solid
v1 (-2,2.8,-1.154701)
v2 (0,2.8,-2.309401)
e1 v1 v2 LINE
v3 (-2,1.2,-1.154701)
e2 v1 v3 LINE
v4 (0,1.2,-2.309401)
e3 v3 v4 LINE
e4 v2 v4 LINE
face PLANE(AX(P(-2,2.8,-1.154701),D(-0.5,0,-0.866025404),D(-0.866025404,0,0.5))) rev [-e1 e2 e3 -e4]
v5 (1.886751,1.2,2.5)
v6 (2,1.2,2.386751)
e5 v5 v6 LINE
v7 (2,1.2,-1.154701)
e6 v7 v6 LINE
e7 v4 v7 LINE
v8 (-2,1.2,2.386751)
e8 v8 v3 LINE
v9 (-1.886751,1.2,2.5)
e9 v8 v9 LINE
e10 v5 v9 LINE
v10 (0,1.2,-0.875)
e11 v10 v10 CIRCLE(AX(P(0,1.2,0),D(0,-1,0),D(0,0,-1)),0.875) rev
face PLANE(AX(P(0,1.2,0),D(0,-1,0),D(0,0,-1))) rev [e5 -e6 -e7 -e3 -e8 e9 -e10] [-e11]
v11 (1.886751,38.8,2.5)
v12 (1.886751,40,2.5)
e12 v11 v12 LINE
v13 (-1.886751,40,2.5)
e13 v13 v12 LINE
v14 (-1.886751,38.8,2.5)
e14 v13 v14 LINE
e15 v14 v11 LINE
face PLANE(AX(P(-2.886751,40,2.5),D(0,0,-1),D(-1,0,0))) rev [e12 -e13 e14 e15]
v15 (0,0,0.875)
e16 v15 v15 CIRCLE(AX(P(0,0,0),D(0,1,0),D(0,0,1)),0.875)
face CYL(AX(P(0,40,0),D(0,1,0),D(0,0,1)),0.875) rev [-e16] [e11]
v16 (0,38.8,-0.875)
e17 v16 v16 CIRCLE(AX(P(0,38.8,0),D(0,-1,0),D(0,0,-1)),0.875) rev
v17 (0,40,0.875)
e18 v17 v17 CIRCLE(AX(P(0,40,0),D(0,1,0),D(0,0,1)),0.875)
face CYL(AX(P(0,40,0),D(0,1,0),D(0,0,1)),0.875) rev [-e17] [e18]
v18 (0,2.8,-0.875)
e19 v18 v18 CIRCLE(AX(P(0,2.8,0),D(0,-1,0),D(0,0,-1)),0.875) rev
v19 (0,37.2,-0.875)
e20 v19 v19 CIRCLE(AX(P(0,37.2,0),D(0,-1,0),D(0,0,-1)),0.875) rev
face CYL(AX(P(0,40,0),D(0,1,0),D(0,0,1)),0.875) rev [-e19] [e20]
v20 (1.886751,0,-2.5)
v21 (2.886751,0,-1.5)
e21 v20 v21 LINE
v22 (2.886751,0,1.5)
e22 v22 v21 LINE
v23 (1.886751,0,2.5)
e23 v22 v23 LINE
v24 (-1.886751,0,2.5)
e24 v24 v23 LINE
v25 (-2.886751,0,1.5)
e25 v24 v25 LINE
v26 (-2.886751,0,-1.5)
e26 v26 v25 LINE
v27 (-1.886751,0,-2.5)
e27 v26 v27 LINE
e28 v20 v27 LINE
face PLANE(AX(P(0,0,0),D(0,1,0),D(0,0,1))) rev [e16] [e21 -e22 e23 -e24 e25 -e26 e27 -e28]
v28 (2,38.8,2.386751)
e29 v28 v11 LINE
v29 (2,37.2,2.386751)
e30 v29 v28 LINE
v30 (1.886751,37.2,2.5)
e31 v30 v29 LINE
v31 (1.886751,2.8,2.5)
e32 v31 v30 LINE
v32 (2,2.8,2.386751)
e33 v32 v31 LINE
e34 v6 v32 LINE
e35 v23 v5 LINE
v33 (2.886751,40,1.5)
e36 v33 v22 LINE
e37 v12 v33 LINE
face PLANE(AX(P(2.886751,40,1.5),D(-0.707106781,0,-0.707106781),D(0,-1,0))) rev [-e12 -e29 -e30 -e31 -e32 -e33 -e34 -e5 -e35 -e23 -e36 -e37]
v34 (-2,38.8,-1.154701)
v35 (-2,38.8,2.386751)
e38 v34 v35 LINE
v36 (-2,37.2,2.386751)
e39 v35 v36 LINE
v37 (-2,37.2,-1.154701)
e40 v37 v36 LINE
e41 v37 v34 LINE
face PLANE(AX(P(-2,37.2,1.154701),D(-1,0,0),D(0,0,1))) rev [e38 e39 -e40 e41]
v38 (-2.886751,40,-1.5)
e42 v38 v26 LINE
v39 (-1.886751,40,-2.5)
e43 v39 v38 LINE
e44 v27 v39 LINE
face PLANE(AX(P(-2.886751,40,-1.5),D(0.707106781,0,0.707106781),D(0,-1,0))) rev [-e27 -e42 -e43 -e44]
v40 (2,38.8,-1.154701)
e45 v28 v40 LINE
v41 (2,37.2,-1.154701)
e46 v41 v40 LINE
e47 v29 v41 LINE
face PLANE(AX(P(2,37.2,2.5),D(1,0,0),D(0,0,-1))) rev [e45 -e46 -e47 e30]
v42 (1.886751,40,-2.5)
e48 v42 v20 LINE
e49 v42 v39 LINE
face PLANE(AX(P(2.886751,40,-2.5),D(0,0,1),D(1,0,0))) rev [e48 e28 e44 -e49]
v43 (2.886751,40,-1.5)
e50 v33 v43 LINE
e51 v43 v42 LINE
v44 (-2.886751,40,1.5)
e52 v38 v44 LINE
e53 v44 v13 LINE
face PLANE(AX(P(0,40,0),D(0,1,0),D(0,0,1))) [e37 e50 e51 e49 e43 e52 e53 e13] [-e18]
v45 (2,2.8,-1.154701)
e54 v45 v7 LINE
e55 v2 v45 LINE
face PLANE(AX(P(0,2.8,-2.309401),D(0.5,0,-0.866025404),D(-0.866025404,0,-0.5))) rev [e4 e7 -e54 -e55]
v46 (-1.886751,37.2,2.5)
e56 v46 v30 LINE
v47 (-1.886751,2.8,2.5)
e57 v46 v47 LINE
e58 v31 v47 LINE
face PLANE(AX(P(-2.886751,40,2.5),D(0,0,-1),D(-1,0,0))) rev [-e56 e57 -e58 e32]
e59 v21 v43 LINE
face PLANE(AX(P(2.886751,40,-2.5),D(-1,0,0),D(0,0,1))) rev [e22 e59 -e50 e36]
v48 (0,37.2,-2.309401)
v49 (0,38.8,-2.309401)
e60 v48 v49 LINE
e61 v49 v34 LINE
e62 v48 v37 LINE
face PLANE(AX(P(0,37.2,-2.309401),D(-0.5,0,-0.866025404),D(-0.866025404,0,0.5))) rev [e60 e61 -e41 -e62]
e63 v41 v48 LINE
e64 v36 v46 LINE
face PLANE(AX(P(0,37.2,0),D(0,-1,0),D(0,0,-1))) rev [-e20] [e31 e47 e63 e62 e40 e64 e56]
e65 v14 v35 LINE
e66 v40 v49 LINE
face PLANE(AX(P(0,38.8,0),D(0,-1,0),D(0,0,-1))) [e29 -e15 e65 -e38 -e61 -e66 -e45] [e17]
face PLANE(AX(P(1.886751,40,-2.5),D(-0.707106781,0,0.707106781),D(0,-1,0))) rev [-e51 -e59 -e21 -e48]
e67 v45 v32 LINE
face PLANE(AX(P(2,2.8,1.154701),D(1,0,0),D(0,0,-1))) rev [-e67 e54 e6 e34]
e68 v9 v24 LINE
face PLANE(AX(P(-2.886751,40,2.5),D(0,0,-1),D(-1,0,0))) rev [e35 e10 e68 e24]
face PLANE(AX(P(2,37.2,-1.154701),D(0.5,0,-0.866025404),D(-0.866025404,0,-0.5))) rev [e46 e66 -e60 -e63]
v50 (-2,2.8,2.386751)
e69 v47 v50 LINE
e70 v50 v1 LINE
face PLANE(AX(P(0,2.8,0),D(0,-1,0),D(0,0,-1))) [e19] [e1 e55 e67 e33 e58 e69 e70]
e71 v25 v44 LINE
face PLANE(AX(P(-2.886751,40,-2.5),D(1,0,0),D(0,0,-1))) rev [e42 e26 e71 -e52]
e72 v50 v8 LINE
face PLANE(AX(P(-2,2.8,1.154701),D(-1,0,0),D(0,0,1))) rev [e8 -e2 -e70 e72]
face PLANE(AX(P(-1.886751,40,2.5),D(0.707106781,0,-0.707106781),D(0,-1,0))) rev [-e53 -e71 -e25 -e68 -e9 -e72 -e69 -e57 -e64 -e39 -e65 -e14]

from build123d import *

# Parameters (mm, degrees)
SKETCH_1_W              = 5.773502692
SKETCH_1_H              = 5
EXTRUDE_1_DEPTH         = 40
M2_2X0_45_1_D           = 1.75
M2_2X0_45_1_ON_FACE_2_D = 1.75
CUT_EXTRUDE_1_DEPTH     = 0.8
CUT_EXTRUDE_2_DEPTH     = 0.8
CHAMFER_1_SIZE          = 1


with BuildPart() as part:
    # 草图1 → 凸台-拉伸1 (new body)
    with BuildSketch(Plane(origin=(0, 0, 0), x_dir=(1, 0, 0), z_dir=(0, 1, 0))):
        Rectangle(SKETCH_1_W, SKETCH_1_H)
    extrude(amount=EXTRUDE_1_DEPTH)

    # M2.2x0.45 螺纹孔1 (through all)
    with Locations(Plane(origin=(0, 0, 0), x_dir=(0, 0, -1), z_dir=(0, -1, 0))):
        with Locations((0, 0)):
            Hole(M2_2X0_45_1_D / 2)

    # M2.2x0.45 螺纹孔1 on face 2 (through all)
    with Locations(Plane.ZX.offset(40)):
        with Locations((0, 0)):
            Hole(M2_2X0_45_1_ON_FACE_2_D / 2)

    # 草图5 → 切除-拉伸1 (cut, symmetric)
    with BuildSketch(Plane(origin=(0, 2, 0), x_dir=(-1, 0, 0), z_dir=(0, -1, 0))):
        Polygon((-2, -1.154700538), (-2, -2.5), (2, -2.5), (2, -1.154700538), (2, 1.154700538), (0, 2.309401077), (-2, 1.154700538), align=None)
    extrude(amount=CUT_EXTRUDE_1_DEPTH, both=True, mode=Mode.SUBTRACT)

    # 草图6 → 切除-拉伸2 (cut, symmetric)
    with BuildSketch(Plane(origin=(0, 38, 0), x_dir=(1, 0, 0), z_dir=(0, 1, 0))):
        Polygon((2, -2.5), (2, -1.154700538), (2, 1.154700538), (0, 2.309401077), (-2, 1.154700538), (-2, -1.154700538), (-2, -2.5), align=None)
    extrude(amount=CUT_EXTRUDE_2_DEPTH, both=True, mode=Mode.SUBTRACT)

    # 倒角1
    # the kernel refuses this chamfer: 1 mm, written as the material it takes off along each edge
    with BuildSketch(Plane(origin=(-2.886751346, -2.571682988, 2.5), x_dir=(-0.027495876610586494, 0, -0.9996219169112968), z_dir=(0, 1, 0)), Plane(origin=(2.886751346, -2.571682988, 2.5), x_dir=(-0.9996219169112965, 0, 0.027495876610591666), z_dir=(0, 1, 0))) as chamfer_1_piece_1:
        Polygon((CHAMFER_1_SIZE * 0.999621916911, -CHAMFER_1_SIZE * 0.0274958766106), (-CHAMFER_1_SIZE * 0.0274958766106, -CHAMFER_1_SIZE * 0.999621916911), (0, 0), align=None)
    extrude(amount=45.143365976, mode=Mode.SUBTRACT)
    with BuildSketch(Plane(origin=(-2.886751346, -2.571682988, -2.5), x_dir=(-0.027495876610586487, 0, 0.9996219169112968), z_dir=(0, 1, 0)), Plane(origin=(2.886751346, -2.571682988, -2.5), x_dir=(-0.9996219169112968, 0, -0.02749587661058476), z_dir=(0, 1, 0))) as chamfer_1_piece_2:
        Polygon((CHAMFER_1_SIZE * 0.999621916911, CHAMFER_1_SIZE * 0.0274958766106), (-CHAMFER_1_SIZE * 0.0274958766106, CHAMFER_1_SIZE * 0.999621916911), (0, 0), align=None)
    extrude(amount=45.143365976, mode=Mode.SUBTRACT)


solid = part.part
